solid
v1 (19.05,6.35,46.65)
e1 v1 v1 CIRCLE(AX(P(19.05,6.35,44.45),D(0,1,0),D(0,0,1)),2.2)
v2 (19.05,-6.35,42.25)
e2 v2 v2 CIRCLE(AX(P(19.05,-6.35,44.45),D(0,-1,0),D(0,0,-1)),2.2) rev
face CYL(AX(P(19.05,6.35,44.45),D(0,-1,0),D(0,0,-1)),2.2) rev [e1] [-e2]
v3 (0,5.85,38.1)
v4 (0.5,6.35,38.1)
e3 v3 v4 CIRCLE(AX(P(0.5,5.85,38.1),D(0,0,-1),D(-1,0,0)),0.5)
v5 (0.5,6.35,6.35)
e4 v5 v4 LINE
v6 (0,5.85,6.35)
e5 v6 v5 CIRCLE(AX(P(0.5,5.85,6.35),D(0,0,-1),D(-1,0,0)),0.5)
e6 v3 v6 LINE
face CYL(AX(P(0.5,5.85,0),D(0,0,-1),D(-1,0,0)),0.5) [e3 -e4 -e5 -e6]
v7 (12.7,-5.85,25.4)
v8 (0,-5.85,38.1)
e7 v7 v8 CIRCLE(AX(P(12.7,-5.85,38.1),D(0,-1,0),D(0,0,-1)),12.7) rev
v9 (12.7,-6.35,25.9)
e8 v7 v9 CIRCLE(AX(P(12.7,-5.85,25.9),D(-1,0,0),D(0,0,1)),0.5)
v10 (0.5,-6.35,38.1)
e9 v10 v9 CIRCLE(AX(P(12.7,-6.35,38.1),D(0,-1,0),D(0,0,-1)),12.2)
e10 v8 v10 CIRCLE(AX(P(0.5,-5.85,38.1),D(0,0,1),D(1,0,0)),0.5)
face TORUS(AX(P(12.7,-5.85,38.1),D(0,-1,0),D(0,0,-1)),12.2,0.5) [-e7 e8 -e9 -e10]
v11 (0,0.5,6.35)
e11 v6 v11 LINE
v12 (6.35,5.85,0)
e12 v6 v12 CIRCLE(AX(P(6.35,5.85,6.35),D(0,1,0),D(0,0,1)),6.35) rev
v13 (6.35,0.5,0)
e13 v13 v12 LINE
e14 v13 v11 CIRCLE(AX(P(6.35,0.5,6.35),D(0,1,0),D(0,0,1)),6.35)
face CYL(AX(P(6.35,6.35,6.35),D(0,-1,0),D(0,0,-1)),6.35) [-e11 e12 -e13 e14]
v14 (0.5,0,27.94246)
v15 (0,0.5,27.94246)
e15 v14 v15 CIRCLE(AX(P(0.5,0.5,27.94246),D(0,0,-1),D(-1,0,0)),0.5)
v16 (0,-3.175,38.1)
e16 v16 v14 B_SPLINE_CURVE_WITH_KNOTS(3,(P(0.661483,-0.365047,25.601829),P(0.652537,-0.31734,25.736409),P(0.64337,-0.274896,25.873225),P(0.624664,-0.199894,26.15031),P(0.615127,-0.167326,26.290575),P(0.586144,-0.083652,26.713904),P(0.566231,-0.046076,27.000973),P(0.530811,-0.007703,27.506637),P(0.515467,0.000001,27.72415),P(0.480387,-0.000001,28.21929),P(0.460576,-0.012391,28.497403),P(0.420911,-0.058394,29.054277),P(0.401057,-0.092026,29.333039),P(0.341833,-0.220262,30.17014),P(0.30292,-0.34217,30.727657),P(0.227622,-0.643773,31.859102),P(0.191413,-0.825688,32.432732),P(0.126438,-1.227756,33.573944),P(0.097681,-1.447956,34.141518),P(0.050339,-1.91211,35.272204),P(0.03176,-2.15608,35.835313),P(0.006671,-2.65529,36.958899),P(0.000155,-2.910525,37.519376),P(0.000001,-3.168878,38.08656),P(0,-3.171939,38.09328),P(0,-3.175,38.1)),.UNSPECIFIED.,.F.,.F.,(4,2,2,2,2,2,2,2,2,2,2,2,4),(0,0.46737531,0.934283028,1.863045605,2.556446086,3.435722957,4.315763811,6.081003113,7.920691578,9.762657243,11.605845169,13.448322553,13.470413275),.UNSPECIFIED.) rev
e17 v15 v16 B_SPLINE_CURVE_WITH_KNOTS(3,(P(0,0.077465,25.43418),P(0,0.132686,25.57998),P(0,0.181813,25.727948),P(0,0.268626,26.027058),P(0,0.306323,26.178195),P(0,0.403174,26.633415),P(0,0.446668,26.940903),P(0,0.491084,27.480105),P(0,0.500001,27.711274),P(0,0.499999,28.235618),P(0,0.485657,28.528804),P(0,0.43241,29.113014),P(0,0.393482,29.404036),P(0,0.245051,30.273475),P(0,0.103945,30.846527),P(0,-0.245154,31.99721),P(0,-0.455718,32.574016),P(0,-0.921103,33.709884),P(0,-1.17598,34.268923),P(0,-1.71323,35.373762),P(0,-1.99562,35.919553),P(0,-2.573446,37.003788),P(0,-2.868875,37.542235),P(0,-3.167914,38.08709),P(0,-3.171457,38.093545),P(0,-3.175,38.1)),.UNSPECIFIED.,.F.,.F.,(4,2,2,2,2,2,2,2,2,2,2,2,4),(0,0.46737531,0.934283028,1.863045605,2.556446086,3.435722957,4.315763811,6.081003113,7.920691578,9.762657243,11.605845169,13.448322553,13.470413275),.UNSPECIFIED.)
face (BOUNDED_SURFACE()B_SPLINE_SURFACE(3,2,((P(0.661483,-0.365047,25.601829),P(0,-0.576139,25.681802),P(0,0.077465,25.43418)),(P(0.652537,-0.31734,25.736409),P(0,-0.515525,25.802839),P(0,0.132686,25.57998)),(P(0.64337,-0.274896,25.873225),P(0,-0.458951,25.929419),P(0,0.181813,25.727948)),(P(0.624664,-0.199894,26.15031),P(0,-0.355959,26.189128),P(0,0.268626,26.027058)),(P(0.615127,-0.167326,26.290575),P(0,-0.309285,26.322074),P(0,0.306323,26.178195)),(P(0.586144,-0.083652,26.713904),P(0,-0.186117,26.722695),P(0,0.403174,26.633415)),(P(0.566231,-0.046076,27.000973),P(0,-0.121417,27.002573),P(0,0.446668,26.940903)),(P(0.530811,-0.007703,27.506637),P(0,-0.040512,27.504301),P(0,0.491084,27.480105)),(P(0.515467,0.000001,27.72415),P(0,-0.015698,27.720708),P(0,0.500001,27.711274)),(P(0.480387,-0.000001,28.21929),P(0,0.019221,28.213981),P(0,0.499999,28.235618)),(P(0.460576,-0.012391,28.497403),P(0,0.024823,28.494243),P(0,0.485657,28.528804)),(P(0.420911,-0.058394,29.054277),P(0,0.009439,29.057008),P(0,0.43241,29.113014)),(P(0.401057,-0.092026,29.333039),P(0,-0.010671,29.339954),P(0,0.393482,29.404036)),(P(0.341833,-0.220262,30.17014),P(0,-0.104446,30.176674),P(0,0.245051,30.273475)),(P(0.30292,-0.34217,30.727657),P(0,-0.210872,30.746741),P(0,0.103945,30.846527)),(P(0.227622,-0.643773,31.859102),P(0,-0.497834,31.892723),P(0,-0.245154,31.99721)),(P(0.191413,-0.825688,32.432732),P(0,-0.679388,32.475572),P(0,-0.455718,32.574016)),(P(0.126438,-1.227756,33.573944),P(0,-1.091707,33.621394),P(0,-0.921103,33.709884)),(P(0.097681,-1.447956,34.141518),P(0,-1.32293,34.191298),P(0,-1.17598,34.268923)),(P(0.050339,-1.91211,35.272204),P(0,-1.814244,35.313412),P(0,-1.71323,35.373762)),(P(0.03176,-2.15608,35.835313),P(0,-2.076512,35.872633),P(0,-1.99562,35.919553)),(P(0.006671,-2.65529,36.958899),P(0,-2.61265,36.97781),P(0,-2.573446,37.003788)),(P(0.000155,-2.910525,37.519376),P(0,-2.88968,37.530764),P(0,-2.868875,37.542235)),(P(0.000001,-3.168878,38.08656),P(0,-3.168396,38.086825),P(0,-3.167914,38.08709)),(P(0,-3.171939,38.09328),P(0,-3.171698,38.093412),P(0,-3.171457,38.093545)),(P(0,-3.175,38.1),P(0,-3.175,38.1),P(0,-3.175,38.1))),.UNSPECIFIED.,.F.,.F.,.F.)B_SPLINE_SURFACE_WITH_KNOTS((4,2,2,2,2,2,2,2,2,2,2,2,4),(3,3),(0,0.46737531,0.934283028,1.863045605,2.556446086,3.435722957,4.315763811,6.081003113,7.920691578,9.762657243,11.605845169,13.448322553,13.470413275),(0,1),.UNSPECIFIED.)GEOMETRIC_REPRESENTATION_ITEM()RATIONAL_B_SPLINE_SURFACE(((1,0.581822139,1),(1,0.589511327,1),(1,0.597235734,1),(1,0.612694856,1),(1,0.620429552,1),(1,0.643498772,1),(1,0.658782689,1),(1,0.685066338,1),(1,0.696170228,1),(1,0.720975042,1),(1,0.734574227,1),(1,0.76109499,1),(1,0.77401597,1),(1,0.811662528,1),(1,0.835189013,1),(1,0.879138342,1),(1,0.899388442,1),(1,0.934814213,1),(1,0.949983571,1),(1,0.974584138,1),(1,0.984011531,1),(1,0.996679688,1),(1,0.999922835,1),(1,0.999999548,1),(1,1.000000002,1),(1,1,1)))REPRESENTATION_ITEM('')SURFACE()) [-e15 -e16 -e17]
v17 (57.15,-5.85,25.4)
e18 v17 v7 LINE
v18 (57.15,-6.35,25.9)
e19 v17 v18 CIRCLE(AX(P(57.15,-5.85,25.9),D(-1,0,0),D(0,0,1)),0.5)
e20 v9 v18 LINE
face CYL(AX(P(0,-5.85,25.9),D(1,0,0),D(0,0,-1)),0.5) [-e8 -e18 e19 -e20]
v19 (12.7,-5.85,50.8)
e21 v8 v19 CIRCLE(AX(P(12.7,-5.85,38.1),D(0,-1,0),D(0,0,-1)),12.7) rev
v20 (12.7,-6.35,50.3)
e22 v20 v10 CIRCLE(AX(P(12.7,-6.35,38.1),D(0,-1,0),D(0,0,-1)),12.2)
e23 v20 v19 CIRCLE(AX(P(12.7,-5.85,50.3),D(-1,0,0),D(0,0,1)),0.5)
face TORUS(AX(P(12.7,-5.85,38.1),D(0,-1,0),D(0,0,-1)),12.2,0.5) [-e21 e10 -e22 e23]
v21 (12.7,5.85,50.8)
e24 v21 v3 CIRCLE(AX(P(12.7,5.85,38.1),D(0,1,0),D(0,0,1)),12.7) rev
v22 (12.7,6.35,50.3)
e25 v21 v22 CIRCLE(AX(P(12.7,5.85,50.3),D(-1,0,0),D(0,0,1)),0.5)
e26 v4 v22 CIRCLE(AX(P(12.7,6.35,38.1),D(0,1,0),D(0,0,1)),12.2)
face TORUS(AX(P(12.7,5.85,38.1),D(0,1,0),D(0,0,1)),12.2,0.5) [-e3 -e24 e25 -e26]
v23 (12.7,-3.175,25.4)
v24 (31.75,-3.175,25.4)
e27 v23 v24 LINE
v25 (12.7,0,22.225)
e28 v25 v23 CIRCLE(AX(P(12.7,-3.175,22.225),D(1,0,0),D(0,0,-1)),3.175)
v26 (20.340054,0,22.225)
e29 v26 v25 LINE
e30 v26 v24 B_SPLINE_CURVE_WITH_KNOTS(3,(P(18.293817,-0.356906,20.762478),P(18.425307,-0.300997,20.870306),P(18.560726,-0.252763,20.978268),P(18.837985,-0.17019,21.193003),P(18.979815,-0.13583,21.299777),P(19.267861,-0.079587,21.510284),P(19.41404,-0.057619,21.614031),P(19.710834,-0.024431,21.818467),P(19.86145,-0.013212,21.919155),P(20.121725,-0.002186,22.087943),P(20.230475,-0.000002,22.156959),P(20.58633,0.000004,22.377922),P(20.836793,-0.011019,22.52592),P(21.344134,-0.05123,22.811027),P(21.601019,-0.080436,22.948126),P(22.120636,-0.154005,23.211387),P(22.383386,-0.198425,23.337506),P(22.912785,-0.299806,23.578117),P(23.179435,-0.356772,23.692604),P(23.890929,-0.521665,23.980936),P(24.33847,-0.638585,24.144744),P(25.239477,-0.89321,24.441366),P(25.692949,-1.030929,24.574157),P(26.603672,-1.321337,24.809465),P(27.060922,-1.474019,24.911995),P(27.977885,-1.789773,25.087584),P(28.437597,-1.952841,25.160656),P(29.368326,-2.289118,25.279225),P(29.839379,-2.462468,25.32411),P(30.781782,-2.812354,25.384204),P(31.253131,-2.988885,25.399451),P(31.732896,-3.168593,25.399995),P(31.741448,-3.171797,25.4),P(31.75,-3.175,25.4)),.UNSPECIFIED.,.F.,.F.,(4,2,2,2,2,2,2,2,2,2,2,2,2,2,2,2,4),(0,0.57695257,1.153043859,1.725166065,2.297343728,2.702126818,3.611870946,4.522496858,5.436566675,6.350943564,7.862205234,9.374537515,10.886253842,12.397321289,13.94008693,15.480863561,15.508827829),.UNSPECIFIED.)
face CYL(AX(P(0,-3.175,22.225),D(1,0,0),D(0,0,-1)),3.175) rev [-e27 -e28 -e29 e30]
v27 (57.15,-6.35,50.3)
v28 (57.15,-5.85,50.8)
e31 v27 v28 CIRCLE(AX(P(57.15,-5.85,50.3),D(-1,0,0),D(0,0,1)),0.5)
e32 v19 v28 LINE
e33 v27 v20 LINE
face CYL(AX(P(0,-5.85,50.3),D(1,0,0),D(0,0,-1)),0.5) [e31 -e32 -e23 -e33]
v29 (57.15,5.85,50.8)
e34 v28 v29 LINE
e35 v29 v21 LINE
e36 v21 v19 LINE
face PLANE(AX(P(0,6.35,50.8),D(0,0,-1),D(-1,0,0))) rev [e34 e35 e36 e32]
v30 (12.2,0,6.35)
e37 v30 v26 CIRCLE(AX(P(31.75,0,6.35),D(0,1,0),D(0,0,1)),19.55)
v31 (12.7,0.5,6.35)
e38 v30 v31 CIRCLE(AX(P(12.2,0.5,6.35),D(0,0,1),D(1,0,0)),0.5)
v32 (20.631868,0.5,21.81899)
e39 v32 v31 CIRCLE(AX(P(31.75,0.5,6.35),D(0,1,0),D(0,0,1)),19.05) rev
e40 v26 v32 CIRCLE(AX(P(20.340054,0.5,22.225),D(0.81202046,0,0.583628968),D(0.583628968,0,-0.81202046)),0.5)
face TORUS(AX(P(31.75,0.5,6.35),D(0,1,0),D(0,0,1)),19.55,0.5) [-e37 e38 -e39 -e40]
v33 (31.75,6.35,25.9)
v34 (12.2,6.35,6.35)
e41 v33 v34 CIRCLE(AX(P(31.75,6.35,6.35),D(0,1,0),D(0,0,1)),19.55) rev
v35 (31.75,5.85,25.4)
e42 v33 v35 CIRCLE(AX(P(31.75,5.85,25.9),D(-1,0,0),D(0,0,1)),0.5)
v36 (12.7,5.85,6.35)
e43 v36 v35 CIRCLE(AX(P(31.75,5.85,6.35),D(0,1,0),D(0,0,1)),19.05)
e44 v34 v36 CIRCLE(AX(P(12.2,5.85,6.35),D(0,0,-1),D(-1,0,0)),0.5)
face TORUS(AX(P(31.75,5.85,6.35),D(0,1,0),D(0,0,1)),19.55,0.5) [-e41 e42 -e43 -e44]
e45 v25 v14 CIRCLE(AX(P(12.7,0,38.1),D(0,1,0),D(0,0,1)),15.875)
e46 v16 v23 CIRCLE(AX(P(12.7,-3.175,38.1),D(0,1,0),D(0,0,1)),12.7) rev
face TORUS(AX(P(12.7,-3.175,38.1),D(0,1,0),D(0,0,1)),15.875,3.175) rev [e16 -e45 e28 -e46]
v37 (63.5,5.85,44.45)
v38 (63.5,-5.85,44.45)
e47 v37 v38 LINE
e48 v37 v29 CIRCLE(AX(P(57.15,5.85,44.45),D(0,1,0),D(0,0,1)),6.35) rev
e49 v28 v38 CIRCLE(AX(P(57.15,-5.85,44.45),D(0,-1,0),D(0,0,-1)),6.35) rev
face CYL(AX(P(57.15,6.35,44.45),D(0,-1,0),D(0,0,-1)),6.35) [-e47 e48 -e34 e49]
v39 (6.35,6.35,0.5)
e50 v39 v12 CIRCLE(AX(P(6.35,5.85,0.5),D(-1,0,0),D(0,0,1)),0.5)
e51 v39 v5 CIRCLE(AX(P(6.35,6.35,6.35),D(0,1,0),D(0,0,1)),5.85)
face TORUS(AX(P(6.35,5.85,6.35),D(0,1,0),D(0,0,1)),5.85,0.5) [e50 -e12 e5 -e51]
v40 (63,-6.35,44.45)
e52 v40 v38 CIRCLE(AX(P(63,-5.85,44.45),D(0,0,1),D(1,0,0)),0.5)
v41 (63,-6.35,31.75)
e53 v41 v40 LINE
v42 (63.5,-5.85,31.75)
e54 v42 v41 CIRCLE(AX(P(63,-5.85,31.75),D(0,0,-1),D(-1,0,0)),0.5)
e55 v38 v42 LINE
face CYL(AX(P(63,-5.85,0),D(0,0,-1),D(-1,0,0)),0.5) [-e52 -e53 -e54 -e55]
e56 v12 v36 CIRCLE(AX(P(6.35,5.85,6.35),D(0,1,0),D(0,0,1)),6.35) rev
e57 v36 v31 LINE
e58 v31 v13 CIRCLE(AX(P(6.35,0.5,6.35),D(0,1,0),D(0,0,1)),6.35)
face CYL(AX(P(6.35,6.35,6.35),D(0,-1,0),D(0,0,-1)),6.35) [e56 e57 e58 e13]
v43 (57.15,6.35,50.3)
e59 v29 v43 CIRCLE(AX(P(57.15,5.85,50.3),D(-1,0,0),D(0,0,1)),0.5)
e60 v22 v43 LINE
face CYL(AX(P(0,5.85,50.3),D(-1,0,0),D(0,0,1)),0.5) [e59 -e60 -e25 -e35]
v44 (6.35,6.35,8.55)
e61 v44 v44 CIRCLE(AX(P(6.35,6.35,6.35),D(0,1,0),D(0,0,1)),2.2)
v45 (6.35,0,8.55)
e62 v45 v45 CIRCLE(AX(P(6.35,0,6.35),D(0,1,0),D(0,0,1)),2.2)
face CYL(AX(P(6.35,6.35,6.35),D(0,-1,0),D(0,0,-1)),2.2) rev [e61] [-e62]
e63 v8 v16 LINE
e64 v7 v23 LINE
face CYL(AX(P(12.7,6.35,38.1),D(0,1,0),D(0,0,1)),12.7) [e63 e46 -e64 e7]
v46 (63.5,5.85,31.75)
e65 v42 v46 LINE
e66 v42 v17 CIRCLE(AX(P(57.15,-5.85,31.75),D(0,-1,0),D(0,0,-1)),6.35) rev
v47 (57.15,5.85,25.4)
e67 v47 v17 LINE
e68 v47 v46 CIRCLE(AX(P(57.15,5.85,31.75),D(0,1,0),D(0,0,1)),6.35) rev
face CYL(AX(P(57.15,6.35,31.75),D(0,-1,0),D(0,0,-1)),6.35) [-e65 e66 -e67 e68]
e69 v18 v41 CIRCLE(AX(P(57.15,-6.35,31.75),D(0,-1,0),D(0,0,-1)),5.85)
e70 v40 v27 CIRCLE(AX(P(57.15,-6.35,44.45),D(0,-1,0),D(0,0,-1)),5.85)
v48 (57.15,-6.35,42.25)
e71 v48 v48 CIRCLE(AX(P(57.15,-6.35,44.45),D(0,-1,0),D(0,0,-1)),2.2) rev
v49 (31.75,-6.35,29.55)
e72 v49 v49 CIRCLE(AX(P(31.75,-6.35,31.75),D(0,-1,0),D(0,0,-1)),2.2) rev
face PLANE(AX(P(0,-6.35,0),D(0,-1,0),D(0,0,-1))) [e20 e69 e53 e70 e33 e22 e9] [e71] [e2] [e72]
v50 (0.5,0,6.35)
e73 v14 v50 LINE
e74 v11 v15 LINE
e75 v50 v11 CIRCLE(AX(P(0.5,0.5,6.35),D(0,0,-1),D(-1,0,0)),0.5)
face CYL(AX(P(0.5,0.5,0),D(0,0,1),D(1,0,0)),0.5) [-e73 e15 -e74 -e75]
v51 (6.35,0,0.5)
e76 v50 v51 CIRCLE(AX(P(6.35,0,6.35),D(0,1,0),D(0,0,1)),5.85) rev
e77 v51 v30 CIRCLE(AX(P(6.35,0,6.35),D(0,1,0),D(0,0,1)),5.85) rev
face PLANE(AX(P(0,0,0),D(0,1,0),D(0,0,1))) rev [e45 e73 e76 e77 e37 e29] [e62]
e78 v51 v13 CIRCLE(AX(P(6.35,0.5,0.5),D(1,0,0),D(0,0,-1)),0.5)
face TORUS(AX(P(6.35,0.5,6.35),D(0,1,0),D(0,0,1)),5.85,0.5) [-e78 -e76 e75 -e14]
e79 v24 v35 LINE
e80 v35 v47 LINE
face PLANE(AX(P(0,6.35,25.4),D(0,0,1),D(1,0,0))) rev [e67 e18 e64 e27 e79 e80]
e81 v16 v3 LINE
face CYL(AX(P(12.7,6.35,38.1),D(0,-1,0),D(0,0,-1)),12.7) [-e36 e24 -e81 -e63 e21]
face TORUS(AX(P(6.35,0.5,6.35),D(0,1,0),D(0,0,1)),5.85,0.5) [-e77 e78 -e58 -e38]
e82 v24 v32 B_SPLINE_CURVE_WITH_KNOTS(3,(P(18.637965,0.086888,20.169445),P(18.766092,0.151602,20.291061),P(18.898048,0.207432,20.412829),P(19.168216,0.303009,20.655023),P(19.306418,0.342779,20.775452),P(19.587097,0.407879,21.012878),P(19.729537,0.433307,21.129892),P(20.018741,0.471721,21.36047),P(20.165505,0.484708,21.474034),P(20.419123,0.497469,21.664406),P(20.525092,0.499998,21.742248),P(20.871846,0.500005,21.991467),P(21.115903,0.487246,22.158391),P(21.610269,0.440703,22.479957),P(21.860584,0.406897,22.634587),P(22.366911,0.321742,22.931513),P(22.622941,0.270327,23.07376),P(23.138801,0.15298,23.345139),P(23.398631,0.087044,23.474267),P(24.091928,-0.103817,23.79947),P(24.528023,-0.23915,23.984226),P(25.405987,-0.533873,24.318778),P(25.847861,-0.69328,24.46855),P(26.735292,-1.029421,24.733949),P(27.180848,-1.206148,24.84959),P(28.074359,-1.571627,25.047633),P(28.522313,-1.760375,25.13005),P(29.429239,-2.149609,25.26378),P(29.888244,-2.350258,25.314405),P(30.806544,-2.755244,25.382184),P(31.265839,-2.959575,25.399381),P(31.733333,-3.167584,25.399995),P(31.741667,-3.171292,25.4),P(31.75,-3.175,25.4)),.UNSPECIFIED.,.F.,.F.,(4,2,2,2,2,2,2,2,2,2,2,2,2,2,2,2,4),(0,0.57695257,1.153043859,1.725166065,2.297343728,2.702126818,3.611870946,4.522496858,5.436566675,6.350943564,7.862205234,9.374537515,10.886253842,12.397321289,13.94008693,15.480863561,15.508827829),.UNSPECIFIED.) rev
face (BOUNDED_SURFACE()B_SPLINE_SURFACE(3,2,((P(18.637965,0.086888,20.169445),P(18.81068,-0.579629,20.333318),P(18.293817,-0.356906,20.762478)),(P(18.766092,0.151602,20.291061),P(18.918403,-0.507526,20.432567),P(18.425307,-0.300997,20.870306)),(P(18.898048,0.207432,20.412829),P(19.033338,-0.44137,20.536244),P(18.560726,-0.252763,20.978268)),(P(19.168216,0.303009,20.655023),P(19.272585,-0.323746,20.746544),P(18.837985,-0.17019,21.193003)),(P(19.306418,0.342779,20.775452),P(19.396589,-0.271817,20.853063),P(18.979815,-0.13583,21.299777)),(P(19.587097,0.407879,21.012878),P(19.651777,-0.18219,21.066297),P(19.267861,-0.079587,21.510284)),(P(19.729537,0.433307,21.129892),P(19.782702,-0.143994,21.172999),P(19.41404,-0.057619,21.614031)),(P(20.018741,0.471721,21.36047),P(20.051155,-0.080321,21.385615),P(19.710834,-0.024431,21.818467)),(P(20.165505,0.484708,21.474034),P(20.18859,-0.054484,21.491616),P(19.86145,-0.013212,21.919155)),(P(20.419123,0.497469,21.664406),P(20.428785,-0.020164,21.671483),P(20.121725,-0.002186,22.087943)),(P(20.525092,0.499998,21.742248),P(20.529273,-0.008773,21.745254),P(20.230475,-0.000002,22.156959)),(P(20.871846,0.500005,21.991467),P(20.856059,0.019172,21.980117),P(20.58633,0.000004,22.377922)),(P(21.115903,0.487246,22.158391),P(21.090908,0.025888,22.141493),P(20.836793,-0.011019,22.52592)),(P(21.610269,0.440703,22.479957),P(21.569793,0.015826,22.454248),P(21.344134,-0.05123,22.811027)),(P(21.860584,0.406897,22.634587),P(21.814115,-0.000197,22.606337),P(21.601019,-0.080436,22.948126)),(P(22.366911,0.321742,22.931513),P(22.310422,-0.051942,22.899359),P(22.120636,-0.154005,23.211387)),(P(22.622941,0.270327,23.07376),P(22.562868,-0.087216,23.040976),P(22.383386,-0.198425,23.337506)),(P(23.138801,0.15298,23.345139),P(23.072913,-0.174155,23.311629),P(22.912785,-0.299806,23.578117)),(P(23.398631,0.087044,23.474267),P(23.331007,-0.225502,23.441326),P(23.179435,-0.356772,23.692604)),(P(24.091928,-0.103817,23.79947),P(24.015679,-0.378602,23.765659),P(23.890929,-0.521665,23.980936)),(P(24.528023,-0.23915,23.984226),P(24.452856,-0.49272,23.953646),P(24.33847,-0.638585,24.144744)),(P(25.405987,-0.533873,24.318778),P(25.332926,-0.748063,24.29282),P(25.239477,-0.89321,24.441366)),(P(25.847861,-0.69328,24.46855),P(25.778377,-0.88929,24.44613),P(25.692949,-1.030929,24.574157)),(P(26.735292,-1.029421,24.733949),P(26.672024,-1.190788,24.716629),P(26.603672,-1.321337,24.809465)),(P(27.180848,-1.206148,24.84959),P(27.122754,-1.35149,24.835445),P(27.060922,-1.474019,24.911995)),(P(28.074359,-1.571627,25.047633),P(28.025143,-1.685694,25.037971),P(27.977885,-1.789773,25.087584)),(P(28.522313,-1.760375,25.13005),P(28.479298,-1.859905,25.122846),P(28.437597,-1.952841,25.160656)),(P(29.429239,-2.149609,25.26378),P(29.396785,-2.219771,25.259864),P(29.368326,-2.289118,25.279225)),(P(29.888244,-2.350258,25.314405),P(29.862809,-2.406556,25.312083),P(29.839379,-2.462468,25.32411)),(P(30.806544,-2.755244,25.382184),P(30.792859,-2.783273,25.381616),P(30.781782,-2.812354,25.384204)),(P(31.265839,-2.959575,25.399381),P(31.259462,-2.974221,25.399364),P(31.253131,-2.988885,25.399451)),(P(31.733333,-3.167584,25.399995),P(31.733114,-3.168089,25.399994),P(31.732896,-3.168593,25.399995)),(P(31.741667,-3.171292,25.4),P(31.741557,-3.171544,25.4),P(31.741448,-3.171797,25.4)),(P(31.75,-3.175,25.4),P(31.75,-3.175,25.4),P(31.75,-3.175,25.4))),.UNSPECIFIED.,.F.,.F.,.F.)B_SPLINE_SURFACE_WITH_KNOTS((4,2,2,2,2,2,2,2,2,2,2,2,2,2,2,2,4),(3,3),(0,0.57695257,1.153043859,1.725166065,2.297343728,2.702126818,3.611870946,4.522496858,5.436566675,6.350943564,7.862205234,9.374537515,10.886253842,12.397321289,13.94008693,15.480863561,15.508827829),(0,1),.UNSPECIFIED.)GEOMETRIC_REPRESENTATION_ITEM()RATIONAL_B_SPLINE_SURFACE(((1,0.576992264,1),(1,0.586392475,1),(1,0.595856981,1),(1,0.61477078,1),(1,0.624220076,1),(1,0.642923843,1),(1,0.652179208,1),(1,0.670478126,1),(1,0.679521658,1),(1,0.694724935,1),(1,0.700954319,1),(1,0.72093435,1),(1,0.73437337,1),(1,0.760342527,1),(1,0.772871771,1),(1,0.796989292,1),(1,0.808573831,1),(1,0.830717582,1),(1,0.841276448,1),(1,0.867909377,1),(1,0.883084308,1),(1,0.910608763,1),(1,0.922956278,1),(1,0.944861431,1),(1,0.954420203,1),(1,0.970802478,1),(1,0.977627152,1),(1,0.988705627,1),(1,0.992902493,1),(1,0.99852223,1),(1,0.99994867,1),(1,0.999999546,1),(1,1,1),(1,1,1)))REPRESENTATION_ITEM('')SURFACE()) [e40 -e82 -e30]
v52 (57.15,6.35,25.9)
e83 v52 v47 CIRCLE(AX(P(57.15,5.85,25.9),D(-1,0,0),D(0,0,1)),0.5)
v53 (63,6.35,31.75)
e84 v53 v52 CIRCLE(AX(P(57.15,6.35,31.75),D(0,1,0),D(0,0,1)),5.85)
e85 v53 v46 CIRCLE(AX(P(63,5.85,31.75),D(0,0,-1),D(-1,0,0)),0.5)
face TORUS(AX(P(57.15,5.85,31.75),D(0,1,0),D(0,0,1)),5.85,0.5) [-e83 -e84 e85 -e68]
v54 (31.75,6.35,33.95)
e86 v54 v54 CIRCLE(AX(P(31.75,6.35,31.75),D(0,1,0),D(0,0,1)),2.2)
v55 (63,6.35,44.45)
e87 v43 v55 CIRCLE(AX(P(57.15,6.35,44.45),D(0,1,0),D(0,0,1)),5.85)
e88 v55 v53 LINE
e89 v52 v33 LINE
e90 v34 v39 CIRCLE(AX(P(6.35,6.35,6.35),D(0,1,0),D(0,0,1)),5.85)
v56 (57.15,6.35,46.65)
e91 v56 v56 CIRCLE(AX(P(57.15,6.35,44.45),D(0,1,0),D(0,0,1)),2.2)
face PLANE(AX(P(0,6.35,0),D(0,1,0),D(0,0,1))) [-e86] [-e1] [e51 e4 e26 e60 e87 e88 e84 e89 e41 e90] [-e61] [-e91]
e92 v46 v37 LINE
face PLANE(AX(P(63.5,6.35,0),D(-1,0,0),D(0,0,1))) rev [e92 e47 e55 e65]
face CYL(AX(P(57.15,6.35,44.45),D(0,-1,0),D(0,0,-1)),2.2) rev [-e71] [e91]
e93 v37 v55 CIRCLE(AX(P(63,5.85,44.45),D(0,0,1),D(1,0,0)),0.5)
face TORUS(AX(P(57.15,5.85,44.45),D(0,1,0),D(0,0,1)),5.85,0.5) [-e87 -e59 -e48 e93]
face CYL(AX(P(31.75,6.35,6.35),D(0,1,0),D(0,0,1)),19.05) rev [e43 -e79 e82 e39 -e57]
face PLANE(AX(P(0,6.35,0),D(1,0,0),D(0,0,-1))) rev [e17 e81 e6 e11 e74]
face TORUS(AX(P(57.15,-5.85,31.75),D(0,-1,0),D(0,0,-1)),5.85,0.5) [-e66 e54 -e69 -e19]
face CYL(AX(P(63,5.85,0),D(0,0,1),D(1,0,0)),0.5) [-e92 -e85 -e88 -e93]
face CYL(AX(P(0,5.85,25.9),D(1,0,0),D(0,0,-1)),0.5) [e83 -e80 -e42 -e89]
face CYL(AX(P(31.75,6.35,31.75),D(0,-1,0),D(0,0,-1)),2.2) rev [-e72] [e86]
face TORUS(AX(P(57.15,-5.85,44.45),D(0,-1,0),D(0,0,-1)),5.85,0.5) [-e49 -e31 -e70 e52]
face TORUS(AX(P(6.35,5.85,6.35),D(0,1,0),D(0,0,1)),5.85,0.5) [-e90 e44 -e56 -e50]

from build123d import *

# Parameters (mm, degrees)
SKETCH1_R           = 2.2
BOSS_EXTRUDE1_DEPTH = 6.35
FILLET3_R           = 19.05
FILLET4_R           = 6.35
FILLET5_R           = 6.35
FILLET10_R          = 12.7
SKETCH3_R           = 2.2
BOSS_EXTRUDE3_DEPTH = 6.35
FILLET6_R           = 12.7
FILLET8_R           = 3.175
FILLET9_R           = 0.5


with BuildPart() as part:
    # Sketch1 → Boss-Extrude1 (new body)
    with BuildSketch(Plane(origin=(0, 0, 0), x_dir=(1, 0, 0), z_dir=(0, 1, 0))):
        Polygon((63.5, -25.4), (12.7, -25.4), (12.7, 0), (0, 0), (0, -50.8), (63.5, -50.8), align=None)
        with Locations(Location((6.35, -6.35, 0), (0, 0, 270))):
            Circle(SKETCH1_R, mode=Mode.SUBTRACT)
        with Locations(Location((31.75, -31.75, 0), (0, 0, 270))):
            Circle(SKETCH1_R, mode=Mode.SUBTRACT)
        with Locations(Location((57.15, -44.45, 0), (0, 0, 270))):
            Circle(SKETCH1_R, mode=Mode.SUBTRACT)
        with Locations(Location((19.05, -44.45, 0), (0, 0, 270))):
            Circle(SKETCH1_R, mode=Mode.SUBTRACT)
    extrude(amount=BOSS_EXTRUDE1_DEPTH)

    # Fillet3
    fillet3_edges = [part.edges().sort_by_distance(p)[0] for p in [
        (12.7, 3.175, 25.4),
    ]]
    fillet(fillet3_edges, radius=FILLET3_R)

    # Fillet4
    fillet4_edges = [part.edges().sort_by_distance(p)[0] for p in [
        (0, 3.175, 0),
        (12.7, 3.175, 0),
    ]]
    fillet(fillet4_edges, radius=FILLET4_R - 0.0001)  # a hair under: the kernel refuses the full size

    # Fillet5
    fillet5_edges = [part.edges().sort_by_distance(p)[0] for p in [
        (63.5, 3.175, 25.4),
        (63.5, 3.175, 50.8),
    ]]
    fillet(fillet5_edges, radius=FILLET5_R)

    # Fillet10
    fillet10_edges = [part.edges().sort_by_distance(p)[0] for p in [
        (0, 3.175, 50.8),
    ]]
    fillet(fillet10_edges, radius=FILLET10_R)

    # Sketch3 → Boss-Extrude3 (add)
    with BuildSketch(Plane.XZ):
        with BuildLine():
            Line((0, 25.4), (31.75, 25.4))
            Line((31.75, 25.4), (57.15, 25.4))
            ThreePointArc((57.15, 25.4), (61.640128061, 27.259871939), (63.5, 31.75))
            Line((63.5, 31.75), (63.5, 44.45))
            ThreePointArc((63.5, 44.45), (61.640128061, 48.940128061), (57.15, 50.8))
            Line((57.15, 50.8), (12.7, 50.8))
            ThreePointArc((12.7, 50.8), (3.719743879, 47.080256121), (0, 38.1))
            Line((0, 38.1), (0, 25.4))
        make_face()
        with Locations(Location((19.05, 44.45, 0), (0, 0, 270))):
            Circle(SKETCH3_R, mode=Mode.SUBTRACT)
        with Locations(Location((31.75, 31.75, 0), (0, 0, 270))):
            Circle(SKETCH3_R, mode=Mode.SUBTRACT)
        with Locations(Location((57.15, 44.45, 0), (0, 0, 270))):
            Circle(SKETCH3_R, mode=Mode.SUBTRACT)
    extrude(amount=BOSS_EXTRUDE3_DEPTH)

    # Fillet6
    fillet6_edges = [part.edges().sort_by_distance(p)[0] for p in [
        (0, -3.175, 25.4),
    ]]
    fillet(fillet6_edges, radius=FILLET6_R - 0.0001)  # a hair under: the kernel refuses the full size

    # Fillet8
    fillet8_edges = [part.edges().sort_by_distance(p)[0] for p in [
        (22.22495, 0, 25.4),
    ]]
    fillet(fillet8_edges, radius=FILLET8_R)

    # Fillet9
    fillet9_edges = [part.edges().sort_by_distance(p)[0] for p in [
        (3.71971459, -6.35, 29.11971459),
        (18.279615818, 6.35, 19.820384182),
        (0, 0, 17.462416667),
        (1.85984265, 0, 1.85984265),
        (10.84015735, 0, 1.85984265),
        (0, 6.35, 22.22495),
        (1.85984265, 6.35, 1.85984265),
        (10.84015735, 6.35, 1.85984265),
        (63.5, 6.35, 38.1),
        (44.45, 6.35, 25.4),
        (61.640128061, 6.35, 27.259871939),
        (61.640128061, 6.35, 48.940128061),
        (34.925, 6.35, 50.8),
        (3.719743879, 6.35, 47.080256121),
        (34.92495, -6.35, 25.4),
        (61.640128061, -6.35, 27.259871939),
        (63.5, -6.35, 38.1),
        (61.640128061, -6.35, 48.940128061),
        (34.925, -6.35, 50.8),
        (3.719743879, -6.35, 47.080256121),
    ]]
    fillet(fillet9_edges, radius=FILLET9_R)


solid = part.part
